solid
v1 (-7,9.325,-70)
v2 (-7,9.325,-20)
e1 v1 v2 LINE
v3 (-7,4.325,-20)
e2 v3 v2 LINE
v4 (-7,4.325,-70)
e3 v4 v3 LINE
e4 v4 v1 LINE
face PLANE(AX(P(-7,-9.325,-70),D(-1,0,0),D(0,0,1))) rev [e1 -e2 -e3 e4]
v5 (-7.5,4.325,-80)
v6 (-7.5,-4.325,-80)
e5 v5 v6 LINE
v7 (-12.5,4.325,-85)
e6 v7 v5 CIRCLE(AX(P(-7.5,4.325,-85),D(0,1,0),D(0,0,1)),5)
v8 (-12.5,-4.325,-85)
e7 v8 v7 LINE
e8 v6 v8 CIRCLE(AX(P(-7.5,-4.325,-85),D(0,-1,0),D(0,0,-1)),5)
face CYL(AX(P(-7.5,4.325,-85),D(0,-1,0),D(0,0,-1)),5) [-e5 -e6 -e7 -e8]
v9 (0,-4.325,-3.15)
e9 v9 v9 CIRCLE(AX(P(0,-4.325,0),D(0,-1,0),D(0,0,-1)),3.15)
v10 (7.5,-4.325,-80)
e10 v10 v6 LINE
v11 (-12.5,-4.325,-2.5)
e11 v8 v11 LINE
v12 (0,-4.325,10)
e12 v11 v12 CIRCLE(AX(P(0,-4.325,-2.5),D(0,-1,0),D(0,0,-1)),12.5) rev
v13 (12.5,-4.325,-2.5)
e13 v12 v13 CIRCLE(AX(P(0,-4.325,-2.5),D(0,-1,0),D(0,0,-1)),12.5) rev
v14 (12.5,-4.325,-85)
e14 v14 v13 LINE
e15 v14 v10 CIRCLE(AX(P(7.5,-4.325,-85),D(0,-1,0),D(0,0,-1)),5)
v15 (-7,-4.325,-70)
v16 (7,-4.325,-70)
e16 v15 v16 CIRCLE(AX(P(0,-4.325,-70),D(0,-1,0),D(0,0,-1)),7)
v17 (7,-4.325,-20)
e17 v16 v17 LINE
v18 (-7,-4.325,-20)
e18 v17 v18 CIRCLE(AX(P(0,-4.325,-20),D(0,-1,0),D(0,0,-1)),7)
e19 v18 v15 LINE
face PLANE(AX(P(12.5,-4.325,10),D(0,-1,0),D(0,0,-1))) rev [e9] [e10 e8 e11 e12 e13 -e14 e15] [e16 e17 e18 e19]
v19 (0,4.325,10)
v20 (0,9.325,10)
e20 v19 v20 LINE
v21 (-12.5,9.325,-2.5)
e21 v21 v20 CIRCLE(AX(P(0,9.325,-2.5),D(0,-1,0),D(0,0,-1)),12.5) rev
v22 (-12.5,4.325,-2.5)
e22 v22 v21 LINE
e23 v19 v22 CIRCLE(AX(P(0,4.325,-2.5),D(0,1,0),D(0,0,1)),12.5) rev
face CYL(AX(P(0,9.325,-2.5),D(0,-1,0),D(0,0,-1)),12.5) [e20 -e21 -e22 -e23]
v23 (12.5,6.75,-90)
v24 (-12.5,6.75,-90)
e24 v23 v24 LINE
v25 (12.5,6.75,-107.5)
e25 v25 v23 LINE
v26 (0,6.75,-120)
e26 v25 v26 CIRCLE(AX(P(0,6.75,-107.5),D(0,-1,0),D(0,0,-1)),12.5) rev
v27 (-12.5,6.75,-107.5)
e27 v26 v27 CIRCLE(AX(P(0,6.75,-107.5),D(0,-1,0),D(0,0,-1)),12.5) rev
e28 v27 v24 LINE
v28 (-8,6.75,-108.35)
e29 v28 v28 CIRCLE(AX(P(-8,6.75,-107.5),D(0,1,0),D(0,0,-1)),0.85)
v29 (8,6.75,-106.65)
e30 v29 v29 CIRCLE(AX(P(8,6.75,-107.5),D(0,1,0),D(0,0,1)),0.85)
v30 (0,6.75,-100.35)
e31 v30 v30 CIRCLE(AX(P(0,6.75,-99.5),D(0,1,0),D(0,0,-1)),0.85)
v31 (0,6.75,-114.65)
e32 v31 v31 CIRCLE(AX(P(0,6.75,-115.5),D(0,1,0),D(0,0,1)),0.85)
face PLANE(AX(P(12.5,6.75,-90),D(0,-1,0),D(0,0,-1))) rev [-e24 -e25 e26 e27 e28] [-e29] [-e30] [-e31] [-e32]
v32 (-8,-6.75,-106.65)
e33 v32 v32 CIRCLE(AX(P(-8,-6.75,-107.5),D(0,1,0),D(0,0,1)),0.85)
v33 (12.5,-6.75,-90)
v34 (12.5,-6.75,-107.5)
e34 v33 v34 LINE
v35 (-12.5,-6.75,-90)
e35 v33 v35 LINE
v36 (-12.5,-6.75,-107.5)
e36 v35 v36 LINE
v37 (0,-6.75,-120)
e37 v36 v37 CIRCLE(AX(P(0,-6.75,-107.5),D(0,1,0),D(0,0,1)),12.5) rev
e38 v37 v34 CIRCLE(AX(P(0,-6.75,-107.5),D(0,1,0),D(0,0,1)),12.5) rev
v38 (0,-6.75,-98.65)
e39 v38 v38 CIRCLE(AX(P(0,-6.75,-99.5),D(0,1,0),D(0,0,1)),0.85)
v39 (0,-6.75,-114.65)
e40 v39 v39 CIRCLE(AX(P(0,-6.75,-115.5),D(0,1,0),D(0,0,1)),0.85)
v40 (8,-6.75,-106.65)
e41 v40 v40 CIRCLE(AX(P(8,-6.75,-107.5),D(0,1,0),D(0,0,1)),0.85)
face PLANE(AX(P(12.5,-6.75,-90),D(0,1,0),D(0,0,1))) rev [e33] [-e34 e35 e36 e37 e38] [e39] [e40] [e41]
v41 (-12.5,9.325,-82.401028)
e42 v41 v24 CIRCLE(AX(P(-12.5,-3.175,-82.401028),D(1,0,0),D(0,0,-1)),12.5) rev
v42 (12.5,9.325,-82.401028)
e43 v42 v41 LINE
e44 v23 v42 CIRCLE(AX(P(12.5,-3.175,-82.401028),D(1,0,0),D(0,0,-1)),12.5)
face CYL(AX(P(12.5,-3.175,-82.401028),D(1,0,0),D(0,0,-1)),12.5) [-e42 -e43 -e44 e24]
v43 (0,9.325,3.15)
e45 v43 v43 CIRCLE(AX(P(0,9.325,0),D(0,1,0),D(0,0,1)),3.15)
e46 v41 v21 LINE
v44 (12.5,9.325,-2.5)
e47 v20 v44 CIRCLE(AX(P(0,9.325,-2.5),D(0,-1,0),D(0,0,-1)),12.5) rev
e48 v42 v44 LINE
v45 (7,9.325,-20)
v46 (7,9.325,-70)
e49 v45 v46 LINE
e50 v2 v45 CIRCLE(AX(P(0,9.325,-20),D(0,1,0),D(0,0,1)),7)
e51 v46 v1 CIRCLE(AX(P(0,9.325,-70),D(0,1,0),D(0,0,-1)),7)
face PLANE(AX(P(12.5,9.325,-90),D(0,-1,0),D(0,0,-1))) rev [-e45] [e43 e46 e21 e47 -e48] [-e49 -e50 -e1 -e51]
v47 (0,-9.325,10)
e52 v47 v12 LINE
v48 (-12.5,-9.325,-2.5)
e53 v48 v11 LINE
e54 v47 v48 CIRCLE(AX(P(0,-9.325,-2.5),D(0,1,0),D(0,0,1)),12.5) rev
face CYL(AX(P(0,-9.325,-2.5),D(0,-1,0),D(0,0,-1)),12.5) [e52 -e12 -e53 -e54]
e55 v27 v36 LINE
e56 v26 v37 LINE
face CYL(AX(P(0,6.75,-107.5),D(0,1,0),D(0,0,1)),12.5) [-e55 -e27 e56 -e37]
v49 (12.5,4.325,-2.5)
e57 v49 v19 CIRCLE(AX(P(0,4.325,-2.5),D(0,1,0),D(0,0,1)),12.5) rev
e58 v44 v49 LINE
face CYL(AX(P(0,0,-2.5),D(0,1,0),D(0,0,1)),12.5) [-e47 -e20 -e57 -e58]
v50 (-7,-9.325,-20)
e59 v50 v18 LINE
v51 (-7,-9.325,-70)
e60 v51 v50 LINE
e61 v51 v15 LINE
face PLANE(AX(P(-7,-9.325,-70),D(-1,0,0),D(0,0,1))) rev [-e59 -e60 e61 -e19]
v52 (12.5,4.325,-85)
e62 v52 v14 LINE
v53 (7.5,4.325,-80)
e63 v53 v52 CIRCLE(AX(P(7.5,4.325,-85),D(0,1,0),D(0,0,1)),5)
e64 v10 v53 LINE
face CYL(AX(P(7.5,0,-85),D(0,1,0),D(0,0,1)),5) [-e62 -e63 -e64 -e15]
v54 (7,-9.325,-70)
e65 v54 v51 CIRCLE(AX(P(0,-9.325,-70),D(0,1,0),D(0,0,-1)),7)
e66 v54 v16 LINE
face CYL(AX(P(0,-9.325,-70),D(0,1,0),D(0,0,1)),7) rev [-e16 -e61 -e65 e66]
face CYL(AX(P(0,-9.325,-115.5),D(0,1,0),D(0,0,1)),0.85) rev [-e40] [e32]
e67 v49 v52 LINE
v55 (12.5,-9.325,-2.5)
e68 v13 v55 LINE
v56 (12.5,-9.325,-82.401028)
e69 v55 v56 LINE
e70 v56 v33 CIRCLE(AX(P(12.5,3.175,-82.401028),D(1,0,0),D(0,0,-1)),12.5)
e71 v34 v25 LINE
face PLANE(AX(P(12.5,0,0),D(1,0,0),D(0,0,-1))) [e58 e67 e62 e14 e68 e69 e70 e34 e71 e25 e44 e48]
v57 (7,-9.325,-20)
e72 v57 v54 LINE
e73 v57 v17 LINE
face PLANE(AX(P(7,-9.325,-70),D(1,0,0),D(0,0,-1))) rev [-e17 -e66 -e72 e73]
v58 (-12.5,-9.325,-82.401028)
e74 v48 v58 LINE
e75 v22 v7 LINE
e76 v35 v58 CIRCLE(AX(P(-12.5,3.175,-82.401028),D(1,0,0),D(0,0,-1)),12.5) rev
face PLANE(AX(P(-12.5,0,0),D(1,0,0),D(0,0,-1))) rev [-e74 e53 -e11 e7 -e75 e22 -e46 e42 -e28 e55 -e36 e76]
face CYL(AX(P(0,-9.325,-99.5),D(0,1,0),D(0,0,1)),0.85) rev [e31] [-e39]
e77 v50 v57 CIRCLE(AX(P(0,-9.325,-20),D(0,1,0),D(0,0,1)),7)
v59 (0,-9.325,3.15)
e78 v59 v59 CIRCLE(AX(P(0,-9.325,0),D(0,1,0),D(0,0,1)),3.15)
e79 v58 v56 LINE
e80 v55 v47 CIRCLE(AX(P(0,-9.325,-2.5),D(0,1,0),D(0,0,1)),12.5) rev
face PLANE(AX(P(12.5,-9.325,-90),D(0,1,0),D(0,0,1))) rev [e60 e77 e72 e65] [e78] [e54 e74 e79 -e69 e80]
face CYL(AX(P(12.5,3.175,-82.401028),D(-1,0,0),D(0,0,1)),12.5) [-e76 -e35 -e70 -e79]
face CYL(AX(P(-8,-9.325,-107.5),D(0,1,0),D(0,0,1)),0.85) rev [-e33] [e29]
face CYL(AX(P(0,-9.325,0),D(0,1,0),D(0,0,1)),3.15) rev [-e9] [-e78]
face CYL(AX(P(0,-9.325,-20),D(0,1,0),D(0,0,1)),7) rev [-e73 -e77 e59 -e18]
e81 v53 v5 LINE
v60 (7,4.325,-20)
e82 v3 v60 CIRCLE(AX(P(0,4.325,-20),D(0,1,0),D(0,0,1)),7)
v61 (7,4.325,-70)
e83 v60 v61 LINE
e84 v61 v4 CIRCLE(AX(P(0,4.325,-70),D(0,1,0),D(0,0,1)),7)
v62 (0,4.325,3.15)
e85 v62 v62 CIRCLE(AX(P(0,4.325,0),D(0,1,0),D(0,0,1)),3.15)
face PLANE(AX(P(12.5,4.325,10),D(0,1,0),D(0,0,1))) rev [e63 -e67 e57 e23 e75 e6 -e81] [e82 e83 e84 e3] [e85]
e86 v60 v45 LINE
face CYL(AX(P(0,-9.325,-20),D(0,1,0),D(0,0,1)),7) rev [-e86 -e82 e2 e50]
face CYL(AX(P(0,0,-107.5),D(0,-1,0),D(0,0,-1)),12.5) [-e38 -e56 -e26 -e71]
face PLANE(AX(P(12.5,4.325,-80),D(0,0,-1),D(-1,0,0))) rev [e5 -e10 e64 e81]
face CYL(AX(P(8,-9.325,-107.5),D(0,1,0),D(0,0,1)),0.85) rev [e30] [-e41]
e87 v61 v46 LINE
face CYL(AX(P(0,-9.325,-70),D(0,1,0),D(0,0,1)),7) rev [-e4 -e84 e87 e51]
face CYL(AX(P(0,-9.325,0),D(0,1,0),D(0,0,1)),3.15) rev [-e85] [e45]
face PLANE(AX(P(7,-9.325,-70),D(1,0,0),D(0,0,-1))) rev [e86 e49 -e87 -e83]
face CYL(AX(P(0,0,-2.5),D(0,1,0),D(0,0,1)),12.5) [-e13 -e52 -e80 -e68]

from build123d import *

# Parameters (mm, degrees)
BOSS_EXTRU_1_DEPTH      = 12.5
CONG_1_R                = 12.5
ESQUISSE2_R             = 0.85
ENL_V_MAT_EXTRU_1_DEPTH = 122.715469949
ESQUISSE3_R             = 3.15
ENL_V_MAT_EXTRU_2_DEPTH = 123.082236628
ENL_V_MAT_EXTRU_3_DEPTH = 123.082236628
CONG_2_R                = 5


with BuildPart() as part:
    # Esquisse1 → Boss.-Extru.1 (new, symmetric)
    with BuildSketch(Plane(origin=(0, 0, 0), x_dir=(0, 0, -1), z_dir=(1, 0, 0))):
        Polygon((90, 9.325), (-10, 9.325), (-10, 4.325), (80, 4.325), (80, -4.325), (-10, -4.325), (-10, -9.325), (90, -9.325), (90, -6.75), (120, -6.75), (120, 6.75), (90, 6.75), align=None)
    extrude(amount=BOSS_EXTRU_1_DEPTH, both=True)

    # Congé1
    # the kernel refuses this fillet: 12.5 mm, written as the material it takes off along each edge
    with BuildSketch(Plane(origin=(-31.497429925, -9.325, -90), x_dir=(0, 1, 0), z_dir=(1, 0, 0))) as cong_1_piece_1:
        with BuildLine():
            CenterArc((12.5, 7.59897197), CONG_1_R, 180, 37.439095089)
            Line((0, 7.59897197), (-0.25, 7.59897197))
            Line((-0.25, 7.59897197), (-0.25, 0))
            Line((-0.25, 0), (0, -0.25))
            ThreePointArc((0, -0.25), (1.2875, -0.25), (2.3765, -0.151979439))
            Line((2.3765, -0.151979439), (2.575, 0))
        make_face()
    extrude(amount=62.99485985, mode=Mode.SUBTRACT)
    with BuildSketch(Plane(origin=(31.497429925, 9.325, -90), x_dir=(0, 0, 1), z_dir=(-1, 0, 0))) as cong_1_piece_2:
        with BuildLine():
            CenterArc((7.59897197, -12.5), CONG_1_R, 90, 37.439095089)
            Line((0, -2.575), (-0.151979439, -2.3765))
            ThreePointArc((-0.151979439, -2.3765), (-0.25, -1.2875), (-0.25, 0))
            Line((-0.25, 0), (0, 0.25))
            Line((0, 0.25), (7.59897197, 0.25))
            Line((7.59897197, 0.25), (7.59897197, 0))
        make_face()
    extrude(amount=62.99485985, mode=Mode.SUBTRACT)
    with BuildSketch(Plane(origin=(-12.5, 26.925, 10), x_dir=(1, 0, 0), z_dir=(0, -1, 0)), Plane(origin=(-12.5, 40.575, 10), x_dir=(1, 0, 0), z_dir=(0, -1, 0)), Plane(origin=(12.5, 40.575, 10), x_dir=(0, 0, -1), z_dir=(0, -1, 0))) as cong_1_piece_3:
        with BuildLine():
            CenterArc((CONG_1_R, -CONG_1_R), CONG_1_R, 90, 90)
            Line((0, -CONG_1_R), (-CONG_1_R * 0.02, -CONG_1_R))
            Line((-CONG_1_R * 0.02, -CONG_1_R), (-CONG_1_R * 0.02, CONG_1_R * 0.02))
            Line((-CONG_1_R * 0.02, CONG_1_R * 0.02), (CONG_1_R, CONG_1_R * 0.02))
            Line((CONG_1_R, CONG_1_R * 0.02), (CONG_1_R, 0))
        make_face()
    extrude(amount=67.5, mode=Mode.SUBTRACT)
    with BuildSketch(Plane(origin=(12.5, 26.925, 10), x_dir=(-1, 0, 0), z_dir=(0, -1, 0))) as cong_1_piece_4:
        with BuildLine():
            CenterArc((CONG_1_R, CONG_1_R), CONG_1_R, 180, 90)
            Line((0, CONG_1_R), (-CONG_1_R * 0.02, CONG_1_R))
            Line((-CONG_1_R * 0.02, CONG_1_R), (-CONG_1_R * 0.02, -CONG_1_R * 0.02))
            Line((-CONG_1_R * 0.02, -CONG_1_R * 0.02), (CONG_1_R, -CONG_1_R * 0.02))
            Line((CONG_1_R, -CONG_1_R * 0.02), (CONG_1_R, 0))
        make_face()
    extrude(amount=67.5, mode=Mode.SUBTRACT)
    with BuildSketch(Plane(origin=(-12.5, -38, -120), x_dir=(1, 0, 0), z_dir=(0, 1, 0))) as cong_1_piece_5:
        with BuildLine():
            CenterArc((CONG_1_R, -CONG_1_R), CONG_1_R, 90, 90)
            Line((0, -CONG_1_R), (-CONG_1_R * 0.02, -CONG_1_R))
            Line((-CONG_1_R * 0.02, -CONG_1_R), (-CONG_1_R * 0.02, CONG_1_R * 0.02))
            Line((-CONG_1_R * 0.02, CONG_1_R * 0.02), (CONG_1_R, CONG_1_R * 0.02))
            Line((CONG_1_R, CONG_1_R * 0.02), (CONG_1_R, 0))
        make_face()
    extrude(amount=76, mode=Mode.SUBTRACT)
    with BuildSketch(Plane(origin=(12.5, -38, -120), x_dir=(-1, 0, 0), z_dir=(0, 1, 0))) as cong_1_piece_6:
        with BuildLine():
            CenterArc((CONG_1_R, CONG_1_R), CONG_1_R, 180, 90)
            Line((0, CONG_1_R), (-CONG_1_R * 0.02, CONG_1_R))
            Line((-CONG_1_R * 0.02, CONG_1_R), (-CONG_1_R * 0.02, -CONG_1_R * 0.02))
            Line((-CONG_1_R * 0.02, -CONG_1_R * 0.02), (CONG_1_R, -CONG_1_R * 0.02))
            Line((CONG_1_R, -CONG_1_R * 0.02), (CONG_1_R, 0))
        make_face()
    extrude(amount=76, mode=Mode.SUBTRACT)

    # Esquisse2 → Enlèv. mat.-Extru.1 (cut, through all)
    with BuildSketch(Plane(origin=(0, 6.75, 0), x_dir=(1, 0, 0), z_dir=(0, 1, 0))):
        with Locations(Location((8, 107.5, 0), (0, 0, 270))):
            Circle(ESQUISSE2_R)
        with Locations(Location((0, 115.5, 0), (0, 0, 270))):
            Circle(ESQUISSE2_R)
        with Locations(Location((-8, 107.5, 0), (0, 0, 270))):
            Circle(ESQUISSE2_R)
        with Locations(Location((0, 99.5, 0), (0, 0, 270))):
            Circle(ESQUISSE2_R)
    extrude(amount=-ENL_V_MAT_EXTRU_1_DEPTH, mode=Mode.SUBTRACT)

    # Esquisse3 → Enlèv. mat.-Extru.2 (cut, through all)
    with BuildSketch(Plane(origin=(0, 9.325, 0), x_dir=(1, 0, 0), z_dir=(0, 1, 0))):
        with Locations(Location((0, 0, 0), (0, 0, 270))):
            Circle(ESQUISSE3_R)
    extrude(amount=-ENL_V_MAT_EXTRU_2_DEPTH, mode=Mode.SUBTRACT)

    # Esquisse4 → Enlèv. mat.-Extru.3 (cut, through all)
    with BuildSketch(Plane(origin=(0, 9.325, 0), x_dir=(1, 0, 0), z_dir=(0, 1, 0))):
        with BuildLine():
            Line((-7, 70), (-7, 20))
            ThreePointArc((-7, 20), (0, 13), (7, 20))
            Line((7, 20), (7, 70))
            ThreePointArc((7, 70), (0, 77), (-7, 70))
        make_face()
    extrude(amount=-ENL_V_MAT_EXTRU_3_DEPTH, mode=Mode.SUBTRACT)

    # Congé2
    cong_2_edges = [part.edges().sort_by_distance(p)[0] for p in [
        (12.5, 0, -80),
        (-12.5, 0, -80),
    ]]
    fillet(cong_2_edges, radius=CONG_2_R)


solid = part.part
